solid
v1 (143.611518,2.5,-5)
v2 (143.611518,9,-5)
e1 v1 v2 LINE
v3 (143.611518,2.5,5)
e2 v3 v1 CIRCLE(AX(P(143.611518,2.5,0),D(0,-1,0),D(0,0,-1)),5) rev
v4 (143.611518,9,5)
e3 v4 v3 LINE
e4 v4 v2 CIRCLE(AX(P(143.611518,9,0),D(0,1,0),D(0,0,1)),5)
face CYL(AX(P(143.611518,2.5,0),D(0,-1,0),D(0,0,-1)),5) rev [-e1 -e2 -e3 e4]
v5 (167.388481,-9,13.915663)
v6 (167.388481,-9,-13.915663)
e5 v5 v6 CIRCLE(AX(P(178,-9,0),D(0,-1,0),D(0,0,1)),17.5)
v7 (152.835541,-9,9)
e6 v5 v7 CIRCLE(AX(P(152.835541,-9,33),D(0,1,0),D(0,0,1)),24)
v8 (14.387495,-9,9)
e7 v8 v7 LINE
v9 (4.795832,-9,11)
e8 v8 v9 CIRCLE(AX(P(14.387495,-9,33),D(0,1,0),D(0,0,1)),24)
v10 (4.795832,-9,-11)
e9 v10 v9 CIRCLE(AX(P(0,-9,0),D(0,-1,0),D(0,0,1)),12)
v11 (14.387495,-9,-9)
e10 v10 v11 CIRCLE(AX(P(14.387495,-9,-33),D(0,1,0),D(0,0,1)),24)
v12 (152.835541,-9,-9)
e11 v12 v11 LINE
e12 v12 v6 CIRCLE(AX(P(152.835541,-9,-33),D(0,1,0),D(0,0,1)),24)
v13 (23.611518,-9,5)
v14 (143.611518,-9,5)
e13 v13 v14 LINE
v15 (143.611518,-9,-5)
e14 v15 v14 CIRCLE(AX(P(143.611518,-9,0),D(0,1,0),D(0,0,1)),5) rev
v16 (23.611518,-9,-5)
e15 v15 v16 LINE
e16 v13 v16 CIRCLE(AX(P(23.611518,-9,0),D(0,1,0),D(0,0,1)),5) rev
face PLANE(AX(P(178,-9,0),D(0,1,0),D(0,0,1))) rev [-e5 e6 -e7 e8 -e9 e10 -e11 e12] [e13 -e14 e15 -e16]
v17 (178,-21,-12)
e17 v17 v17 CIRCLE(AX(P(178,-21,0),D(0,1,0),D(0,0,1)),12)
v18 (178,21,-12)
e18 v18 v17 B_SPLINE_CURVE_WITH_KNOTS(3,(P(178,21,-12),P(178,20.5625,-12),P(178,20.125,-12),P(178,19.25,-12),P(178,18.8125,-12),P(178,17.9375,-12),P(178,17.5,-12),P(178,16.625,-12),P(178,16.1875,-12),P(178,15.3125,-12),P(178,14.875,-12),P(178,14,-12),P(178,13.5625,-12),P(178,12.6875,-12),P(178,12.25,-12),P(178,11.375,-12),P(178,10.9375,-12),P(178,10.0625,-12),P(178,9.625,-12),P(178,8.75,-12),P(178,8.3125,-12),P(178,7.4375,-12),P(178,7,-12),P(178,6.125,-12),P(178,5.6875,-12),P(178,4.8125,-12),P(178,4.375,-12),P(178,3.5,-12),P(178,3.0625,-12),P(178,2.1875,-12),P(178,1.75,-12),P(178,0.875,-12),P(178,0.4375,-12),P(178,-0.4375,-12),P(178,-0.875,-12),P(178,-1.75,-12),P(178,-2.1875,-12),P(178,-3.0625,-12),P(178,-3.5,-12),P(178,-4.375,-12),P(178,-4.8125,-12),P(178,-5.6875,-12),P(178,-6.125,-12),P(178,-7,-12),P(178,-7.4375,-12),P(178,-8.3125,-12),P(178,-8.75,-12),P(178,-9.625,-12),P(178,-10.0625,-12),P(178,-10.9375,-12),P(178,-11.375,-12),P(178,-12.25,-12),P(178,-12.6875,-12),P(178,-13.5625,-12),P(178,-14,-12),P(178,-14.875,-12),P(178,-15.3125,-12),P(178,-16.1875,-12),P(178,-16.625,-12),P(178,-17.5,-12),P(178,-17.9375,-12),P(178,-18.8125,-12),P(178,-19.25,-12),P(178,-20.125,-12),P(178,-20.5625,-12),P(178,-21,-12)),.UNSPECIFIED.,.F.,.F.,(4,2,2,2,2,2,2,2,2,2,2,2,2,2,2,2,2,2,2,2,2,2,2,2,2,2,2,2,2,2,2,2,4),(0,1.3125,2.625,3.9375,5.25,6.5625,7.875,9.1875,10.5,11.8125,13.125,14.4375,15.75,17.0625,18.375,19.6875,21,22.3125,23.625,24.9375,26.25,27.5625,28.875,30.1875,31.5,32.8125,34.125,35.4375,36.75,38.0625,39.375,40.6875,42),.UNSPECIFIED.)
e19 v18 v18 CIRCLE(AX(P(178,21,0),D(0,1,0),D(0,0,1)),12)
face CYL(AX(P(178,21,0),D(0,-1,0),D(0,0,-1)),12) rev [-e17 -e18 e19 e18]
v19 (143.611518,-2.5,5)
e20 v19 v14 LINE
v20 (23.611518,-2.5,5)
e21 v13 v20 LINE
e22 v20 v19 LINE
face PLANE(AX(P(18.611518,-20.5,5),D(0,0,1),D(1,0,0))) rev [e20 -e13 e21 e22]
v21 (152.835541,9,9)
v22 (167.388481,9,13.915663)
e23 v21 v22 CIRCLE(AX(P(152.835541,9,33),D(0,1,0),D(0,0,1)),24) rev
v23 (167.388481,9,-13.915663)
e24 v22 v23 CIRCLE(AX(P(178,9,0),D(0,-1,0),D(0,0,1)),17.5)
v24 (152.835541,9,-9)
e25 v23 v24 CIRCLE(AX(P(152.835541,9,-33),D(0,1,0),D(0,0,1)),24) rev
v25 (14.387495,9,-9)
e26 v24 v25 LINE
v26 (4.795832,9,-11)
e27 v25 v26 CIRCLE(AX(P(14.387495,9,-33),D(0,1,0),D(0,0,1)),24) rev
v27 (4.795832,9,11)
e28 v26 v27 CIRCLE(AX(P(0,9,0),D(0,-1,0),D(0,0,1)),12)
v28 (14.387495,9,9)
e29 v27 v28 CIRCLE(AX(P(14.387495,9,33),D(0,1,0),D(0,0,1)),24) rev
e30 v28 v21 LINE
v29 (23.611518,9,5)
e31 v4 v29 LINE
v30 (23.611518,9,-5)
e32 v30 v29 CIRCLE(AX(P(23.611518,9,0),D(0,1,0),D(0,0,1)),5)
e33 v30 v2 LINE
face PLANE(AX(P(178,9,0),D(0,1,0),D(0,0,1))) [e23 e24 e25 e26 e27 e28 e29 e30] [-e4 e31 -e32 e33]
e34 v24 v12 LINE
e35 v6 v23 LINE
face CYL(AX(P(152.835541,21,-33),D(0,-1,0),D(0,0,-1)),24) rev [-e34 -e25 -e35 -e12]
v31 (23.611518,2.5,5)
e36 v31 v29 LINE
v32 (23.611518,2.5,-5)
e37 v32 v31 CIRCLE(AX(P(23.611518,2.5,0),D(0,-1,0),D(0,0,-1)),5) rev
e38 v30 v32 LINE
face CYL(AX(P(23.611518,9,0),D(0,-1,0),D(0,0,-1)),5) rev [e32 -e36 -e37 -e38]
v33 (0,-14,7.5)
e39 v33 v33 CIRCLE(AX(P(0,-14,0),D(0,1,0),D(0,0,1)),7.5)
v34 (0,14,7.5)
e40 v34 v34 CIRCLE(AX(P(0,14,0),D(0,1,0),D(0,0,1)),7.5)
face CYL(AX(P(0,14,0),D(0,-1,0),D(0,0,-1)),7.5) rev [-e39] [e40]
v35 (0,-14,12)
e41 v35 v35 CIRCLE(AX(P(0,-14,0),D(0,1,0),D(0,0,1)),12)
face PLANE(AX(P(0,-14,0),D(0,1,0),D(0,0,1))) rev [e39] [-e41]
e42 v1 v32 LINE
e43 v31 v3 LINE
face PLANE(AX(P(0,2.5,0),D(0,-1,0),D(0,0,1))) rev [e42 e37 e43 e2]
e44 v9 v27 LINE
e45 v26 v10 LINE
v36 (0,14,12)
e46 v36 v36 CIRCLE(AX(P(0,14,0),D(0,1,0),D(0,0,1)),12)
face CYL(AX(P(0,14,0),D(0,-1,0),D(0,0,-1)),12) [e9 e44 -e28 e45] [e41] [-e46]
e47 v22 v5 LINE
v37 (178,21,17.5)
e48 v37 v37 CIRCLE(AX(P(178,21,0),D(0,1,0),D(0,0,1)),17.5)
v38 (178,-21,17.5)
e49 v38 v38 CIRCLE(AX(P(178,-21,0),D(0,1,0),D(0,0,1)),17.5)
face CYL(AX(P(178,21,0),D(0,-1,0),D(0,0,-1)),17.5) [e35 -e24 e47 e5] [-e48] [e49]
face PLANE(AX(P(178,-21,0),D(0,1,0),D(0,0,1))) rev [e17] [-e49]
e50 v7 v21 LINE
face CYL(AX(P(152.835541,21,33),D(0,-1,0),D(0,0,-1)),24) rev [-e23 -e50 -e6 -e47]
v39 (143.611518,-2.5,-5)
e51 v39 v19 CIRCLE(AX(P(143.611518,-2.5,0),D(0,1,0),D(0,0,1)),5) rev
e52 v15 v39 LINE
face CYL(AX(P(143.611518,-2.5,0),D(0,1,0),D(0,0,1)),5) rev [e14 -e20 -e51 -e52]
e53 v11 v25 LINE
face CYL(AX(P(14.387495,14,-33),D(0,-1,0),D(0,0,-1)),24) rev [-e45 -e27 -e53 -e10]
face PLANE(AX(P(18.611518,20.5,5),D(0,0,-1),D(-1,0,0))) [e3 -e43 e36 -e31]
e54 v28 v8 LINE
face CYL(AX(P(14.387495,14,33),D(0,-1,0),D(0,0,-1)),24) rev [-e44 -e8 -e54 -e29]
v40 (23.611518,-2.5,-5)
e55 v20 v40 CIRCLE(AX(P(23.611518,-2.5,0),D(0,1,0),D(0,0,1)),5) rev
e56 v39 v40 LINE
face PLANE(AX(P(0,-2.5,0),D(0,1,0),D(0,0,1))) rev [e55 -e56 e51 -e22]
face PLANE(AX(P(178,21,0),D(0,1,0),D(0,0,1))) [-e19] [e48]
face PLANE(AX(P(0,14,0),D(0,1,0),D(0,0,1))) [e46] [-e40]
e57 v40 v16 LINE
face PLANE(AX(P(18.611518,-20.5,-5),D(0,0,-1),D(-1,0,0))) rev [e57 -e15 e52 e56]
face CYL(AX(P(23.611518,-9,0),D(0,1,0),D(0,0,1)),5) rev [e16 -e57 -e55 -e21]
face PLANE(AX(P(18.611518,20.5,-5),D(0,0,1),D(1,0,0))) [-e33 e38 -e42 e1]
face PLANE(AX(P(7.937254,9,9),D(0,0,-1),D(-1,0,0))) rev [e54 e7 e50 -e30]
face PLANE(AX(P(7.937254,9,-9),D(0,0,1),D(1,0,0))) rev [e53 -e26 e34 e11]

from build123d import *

# Parameters (mm, degrees)
SKETCH1_R           = 17.5
SKETCH1_R_2         = 12
BOSS_EXTRUDE1_DEPTH = 21
SKETCH1_5_R         = 12
SKETCH1_5_R_2       = 7.5
BOSS_EXTRUDE2_DEPTH = 14
BOSS_EXTRUDE3_DEPTH = 9
FILLET2_R           = 24
CUT_EXTRUDE1_START  = -2.5
SKETCH4_W           = 130
SKETCH4_H           = 10
CUT_EXTRUDE1_DEPTH  = 18
FILLET4_R           = 5
FILLET5_R           = 5
FILLET6_R           = 5
FILLET7_R           = 5


with BuildPart() as part:
    # Sketch1 → Boss-Extrude1 (new, symmetric)
    with BuildSketch(Plane(origin=(0, 0, 0), x_dir=(1, 0, 0), z_dir=(0, 1, 0))):
        with Locations(Location((178, 0, 0), (0, 0, 90))):
            Circle(SKETCH1_R)
        with Locations(Location((178, 0, 0), (0, 0, 90))):
            Circle(SKETCH1_R_2, mode=Mode.SUBTRACT)
    extrude(amount=BOSS_EXTRUDE1_DEPTH, both=True)



with BuildPart() as body_2:
    # Sketch1<5> → Boss-Extrude2 (new, symmetric)
    with BuildSketch(Plane(origin=(0, 0, 0), x_dir=(1, 0, 0), z_dir=(0, 1, 0))):
        with Locations(Location((0, 0, 0), (0, 0, 270))):
            Circle(SKETCH1_5_R)
        with Locations(Location((0, 0, 0), (0, 0, 270))):
            Circle(SKETCH1_5_R_2, mode=Mode.SUBTRACT)
    extrude(amount=BOSS_EXTRUDE2_DEPTH, both=True)


with BuildPart() as part_1:
    add(part.part)

    add(body_2.part)  # Boss-Extrude3 merges body 2
    # Sketch2 → Boss-Extrude3 (add, symmetric)
    with BuildSketch(Plane(origin=(0, 0, 0), x_dir=(1, 0, 0), z_dir=(0, 1, 0))):
        with BuildLine():
            Line((7.937253933, 9), (162.99166898, 9))
            ThreePointArc((162.99166898, 9), (160.5, 0), (162.99166898, -9))
            Line((162.99166898, -9), (7.937253933, -9))
            ThreePointArc((7.937253933, -9), (12, 0), (7.937253933, 9))
        make_face()
    extrude(amount=BOSS_EXTRUDE3_DEPTH, both=True)

    # Fillet2
    fillet2_edges = [part_1.edges().sort_by_distance(p)[0] for p in [
        (162.99166898, 0, 9),
        (162.99166898, 0, -9),
        (7.937253933, 0, -9),
        (7.937253933, 0, 9),
    ]]
    fillet(fillet2_edges, radius=FILLET2_R)

    # Sketch4 → Cut-Extrude1 (cut)
    with BuildSketch(Plane(origin=(0, 0, 0), x_dir=(1, 0, 0), z_dir=(0, 1, 0)).offset(CUT_EXTRUDE1_START)):
        with Locations((83.611517753, 0)):
            Rectangle(SKETCH4_W, SKETCH4_H)
    cut_extrude1 = extrude(amount=-CUT_EXTRUDE1_DEPTH, mode=Mode.SUBTRACT)

    # Mirror1: Cut-Extrude1 across plane
    add(cut_extrude1.mirror(Plane.ZX), mode=Mode.SUBTRACT)

    # Fillet4
    fillet4_edges = [part_1.edges().sort_by_distance(p)[0] for p in [
        (18.611517753, 5.75, -5),
        (18.611517753, 5.75, 5),
    ]]
    fillet(fillet4_edges, radius=FILLET4_R - 0.0001)  # a hair under: the kernel refuses the full size

    # Fillet5
    fillet5_edges = [part_1.edges().sort_by_distance(p)[0] for p in [
        (148.611517753, 5.75, 5),
        (148.611517753, 5.75, -5),
    ]]
    fillet(fillet5_edges, radius=FILLET5_R - 0.0001)  # a hair under: the kernel refuses the full size

    # Fillet6
    fillet6_edges = [part_1.edges().sort_by_distance(p)[0] for p in [
        (18.611517753, -5.75, 5),
        (18.611517753, -5.75, -5),
    ]]
    fillet(fillet6_edges, radius=FILLET6_R - 0.0001)  # a hair under: the kernel refuses the full size

    # Fillet7
    fillet7_edges = [part_1.edges().sort_by_distance(p)[0] for p in [
        (148.611517753, -5.75, -5),
        (148.611517753, -5.75, 5),
    ]]
    fillet(fillet7_edges, radius=FILLET7_R - 0.0001)  # a hair under: the kernel refuses the full size


solid = part_1.part
